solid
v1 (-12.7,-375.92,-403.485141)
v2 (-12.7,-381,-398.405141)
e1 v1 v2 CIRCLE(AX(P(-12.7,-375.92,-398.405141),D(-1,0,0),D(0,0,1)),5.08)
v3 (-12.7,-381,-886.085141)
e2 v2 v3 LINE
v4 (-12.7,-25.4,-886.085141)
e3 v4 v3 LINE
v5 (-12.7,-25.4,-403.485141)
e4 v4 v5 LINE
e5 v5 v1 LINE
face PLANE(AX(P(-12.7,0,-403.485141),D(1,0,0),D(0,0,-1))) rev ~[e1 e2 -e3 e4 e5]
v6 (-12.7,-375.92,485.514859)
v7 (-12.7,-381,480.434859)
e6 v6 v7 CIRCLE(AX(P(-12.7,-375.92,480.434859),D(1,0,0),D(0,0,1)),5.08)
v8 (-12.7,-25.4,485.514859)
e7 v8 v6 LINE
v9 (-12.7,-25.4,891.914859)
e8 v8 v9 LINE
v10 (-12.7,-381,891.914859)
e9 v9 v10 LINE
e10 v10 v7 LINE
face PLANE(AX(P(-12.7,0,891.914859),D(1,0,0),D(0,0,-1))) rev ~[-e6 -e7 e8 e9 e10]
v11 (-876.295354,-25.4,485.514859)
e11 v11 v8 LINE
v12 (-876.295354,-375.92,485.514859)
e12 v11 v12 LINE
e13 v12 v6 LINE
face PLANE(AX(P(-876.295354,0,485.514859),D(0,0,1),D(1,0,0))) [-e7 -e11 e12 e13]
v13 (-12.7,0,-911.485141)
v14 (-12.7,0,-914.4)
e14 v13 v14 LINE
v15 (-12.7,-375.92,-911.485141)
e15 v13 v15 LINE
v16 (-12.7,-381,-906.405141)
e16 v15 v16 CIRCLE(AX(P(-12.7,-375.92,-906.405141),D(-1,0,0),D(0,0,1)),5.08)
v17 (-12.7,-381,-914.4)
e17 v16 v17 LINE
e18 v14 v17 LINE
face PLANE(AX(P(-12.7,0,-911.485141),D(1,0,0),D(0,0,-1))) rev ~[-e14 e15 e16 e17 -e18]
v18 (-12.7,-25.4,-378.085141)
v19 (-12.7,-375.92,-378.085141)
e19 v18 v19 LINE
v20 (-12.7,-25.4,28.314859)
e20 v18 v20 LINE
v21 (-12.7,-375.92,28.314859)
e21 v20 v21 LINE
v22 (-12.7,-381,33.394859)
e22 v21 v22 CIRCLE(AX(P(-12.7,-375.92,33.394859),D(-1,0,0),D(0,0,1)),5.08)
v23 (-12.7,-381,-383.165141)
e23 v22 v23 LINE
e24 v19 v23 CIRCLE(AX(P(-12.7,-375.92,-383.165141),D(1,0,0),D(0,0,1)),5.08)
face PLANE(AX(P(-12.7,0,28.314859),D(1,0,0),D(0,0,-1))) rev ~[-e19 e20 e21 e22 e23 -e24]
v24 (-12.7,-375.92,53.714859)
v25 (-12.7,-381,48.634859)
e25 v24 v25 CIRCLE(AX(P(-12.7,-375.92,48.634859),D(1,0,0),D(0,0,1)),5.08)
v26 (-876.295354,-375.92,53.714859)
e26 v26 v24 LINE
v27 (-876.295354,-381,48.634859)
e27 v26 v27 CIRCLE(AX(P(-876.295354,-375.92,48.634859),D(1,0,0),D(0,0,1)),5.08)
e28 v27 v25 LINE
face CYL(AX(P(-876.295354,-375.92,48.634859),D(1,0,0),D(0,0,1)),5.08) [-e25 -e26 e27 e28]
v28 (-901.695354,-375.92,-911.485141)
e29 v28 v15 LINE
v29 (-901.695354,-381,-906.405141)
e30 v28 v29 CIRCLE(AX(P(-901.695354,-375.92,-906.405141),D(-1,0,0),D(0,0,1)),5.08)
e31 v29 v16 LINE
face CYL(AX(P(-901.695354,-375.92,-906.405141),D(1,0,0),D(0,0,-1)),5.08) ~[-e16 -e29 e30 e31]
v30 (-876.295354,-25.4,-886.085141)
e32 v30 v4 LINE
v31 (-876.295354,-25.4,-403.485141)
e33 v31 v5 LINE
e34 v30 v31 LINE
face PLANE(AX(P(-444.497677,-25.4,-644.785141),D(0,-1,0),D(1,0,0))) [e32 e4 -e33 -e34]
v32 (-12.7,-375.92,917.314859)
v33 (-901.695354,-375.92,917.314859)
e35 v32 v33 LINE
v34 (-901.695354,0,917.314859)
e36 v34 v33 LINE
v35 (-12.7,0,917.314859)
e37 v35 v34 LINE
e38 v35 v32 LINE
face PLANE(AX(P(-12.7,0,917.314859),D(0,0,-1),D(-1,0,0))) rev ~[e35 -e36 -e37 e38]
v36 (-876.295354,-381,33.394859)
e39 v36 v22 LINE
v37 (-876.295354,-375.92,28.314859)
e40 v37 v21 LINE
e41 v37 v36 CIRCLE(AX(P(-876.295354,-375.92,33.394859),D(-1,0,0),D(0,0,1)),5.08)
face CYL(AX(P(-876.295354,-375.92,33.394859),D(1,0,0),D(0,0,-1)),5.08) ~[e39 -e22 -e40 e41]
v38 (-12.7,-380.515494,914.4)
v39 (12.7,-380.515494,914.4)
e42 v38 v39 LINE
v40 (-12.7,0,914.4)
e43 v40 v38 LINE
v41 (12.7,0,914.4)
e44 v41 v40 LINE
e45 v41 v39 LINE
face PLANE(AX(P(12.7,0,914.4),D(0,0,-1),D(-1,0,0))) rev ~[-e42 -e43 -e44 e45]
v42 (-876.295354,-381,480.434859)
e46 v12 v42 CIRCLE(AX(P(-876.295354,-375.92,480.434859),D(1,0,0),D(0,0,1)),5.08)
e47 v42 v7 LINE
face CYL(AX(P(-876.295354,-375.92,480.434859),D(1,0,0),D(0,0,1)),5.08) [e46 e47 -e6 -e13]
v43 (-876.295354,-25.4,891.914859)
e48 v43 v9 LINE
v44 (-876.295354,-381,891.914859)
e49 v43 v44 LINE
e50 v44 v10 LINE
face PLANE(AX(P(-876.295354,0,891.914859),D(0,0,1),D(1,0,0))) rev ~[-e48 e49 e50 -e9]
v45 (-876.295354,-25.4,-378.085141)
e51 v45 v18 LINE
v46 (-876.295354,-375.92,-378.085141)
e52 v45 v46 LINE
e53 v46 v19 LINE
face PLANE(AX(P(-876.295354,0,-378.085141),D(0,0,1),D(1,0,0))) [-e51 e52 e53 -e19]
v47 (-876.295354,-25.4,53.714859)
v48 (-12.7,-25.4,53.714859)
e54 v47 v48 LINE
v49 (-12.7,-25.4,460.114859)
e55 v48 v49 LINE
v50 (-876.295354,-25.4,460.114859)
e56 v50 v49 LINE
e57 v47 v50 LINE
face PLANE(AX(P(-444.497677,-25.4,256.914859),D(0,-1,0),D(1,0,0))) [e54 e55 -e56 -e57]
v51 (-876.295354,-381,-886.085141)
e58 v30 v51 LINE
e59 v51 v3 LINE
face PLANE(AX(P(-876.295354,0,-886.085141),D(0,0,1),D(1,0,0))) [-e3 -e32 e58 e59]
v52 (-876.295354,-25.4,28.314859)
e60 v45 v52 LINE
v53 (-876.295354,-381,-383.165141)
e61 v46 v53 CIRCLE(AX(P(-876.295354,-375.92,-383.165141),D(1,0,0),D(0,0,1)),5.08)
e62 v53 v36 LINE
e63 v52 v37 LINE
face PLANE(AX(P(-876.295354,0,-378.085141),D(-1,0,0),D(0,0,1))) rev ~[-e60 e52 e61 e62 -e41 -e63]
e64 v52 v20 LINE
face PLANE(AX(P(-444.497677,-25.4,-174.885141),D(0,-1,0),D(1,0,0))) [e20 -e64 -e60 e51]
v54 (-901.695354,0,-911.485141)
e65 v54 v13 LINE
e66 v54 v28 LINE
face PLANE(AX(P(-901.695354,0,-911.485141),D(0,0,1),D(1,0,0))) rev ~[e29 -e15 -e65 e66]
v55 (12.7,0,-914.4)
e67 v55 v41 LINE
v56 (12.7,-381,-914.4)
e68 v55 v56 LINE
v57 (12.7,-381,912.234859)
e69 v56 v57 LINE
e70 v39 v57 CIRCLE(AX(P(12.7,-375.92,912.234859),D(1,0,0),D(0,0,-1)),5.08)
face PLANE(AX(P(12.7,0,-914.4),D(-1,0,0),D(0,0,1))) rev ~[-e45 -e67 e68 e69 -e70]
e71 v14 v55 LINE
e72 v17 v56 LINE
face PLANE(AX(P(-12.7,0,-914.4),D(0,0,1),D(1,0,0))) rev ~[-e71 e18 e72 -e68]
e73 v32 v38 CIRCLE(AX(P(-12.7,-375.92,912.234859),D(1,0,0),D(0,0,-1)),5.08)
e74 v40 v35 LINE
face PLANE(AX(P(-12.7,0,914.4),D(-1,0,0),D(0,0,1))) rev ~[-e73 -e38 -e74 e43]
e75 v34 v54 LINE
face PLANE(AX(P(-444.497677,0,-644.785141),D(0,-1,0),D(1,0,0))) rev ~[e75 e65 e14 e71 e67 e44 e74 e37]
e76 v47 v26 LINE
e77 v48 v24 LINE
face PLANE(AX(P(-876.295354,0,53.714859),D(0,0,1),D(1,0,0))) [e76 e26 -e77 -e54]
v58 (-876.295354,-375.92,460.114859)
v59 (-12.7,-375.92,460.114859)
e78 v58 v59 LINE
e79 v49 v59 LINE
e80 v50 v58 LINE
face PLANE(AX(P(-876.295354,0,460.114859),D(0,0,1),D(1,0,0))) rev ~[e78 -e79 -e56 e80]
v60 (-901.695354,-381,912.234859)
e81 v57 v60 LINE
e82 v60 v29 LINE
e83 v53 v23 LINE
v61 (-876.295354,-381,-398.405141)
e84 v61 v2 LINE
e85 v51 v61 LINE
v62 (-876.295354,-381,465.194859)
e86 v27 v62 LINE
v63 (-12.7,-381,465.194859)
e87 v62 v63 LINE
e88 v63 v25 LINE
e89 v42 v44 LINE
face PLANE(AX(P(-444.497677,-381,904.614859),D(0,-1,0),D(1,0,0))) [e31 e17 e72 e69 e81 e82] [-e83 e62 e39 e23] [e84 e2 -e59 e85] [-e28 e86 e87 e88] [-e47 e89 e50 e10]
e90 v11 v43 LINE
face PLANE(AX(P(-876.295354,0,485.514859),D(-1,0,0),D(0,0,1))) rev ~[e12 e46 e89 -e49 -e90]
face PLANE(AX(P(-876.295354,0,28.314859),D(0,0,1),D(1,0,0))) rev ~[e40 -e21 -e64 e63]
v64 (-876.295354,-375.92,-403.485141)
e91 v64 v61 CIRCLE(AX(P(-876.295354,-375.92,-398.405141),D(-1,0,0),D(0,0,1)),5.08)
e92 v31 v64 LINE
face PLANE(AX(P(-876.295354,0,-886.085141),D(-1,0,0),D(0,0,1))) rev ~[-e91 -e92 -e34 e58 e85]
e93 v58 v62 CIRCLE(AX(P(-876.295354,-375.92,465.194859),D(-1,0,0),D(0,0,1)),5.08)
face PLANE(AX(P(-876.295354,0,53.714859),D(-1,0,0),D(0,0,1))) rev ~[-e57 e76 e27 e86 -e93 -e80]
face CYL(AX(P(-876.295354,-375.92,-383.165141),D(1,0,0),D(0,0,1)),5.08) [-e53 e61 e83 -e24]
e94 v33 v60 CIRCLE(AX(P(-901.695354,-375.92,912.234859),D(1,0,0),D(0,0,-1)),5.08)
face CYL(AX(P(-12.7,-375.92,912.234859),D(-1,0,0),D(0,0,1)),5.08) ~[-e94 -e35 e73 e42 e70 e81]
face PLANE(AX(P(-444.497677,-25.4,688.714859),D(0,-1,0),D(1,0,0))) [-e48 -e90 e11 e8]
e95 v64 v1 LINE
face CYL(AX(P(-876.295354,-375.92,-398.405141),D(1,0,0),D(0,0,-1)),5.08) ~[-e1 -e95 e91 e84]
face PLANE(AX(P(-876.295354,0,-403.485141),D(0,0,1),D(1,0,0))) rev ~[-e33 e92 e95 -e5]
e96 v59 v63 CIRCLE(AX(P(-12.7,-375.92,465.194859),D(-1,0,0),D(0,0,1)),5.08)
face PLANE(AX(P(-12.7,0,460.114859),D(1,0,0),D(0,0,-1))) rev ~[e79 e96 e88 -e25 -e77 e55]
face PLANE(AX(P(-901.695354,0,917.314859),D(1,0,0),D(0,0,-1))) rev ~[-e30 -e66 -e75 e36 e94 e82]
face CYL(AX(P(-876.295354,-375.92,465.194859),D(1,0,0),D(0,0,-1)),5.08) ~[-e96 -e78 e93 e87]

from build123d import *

# Parameters (mm, degrees)
F0_W     = 863.595354099
F0_H     = 25.4
F1_DEPTH = 381
F2_R     = 5.08
F0_H_2   = 482.6
F0_H_3   = 406.4
F3_DEPTH = 25.4


with BuildPart() as f1:
    # F0 (on Front) → F1 (new body)
    with BuildSketch(Plane.XZ):
        Polygon((-12.7, 891.914858846), (-12.7, 914.4), (-12.7, 917.314858846), (-876.295354099, 917.314858846), (-876.295354099, 891.914858846), align=None)
        with Locations((-444.4976770495, -898.785141154)):
            Rectangle(F0_W, F0_H)
        Polygon((-901.695354099, -911.485141154), (-876.295354099, -911.485141154), (-876.295354099, -886.085141154), (-876.295354099, -403.485141154), (-876.295354099, -378.085141154), (-876.295354099, 28.314858846), (-876.295354099, 53.714858846), (-876.295354099, 460.114858846), (-876.295354099, 485.514858846), (-876.295354099, 891.914858846), (-876.295354099, 917.314858846), (-901.695354099, 917.314858846), align=None)
        Polygon((-12.7, -911.485141154), (-12.7, -914.4), (12.7, -914.4), (12.7, 914.4), (-12.7, 914.4), (-12.7, 891.914858846), (-12.7, 485.514858846), (-12.7, 460.114858846), (-12.7, 53.714858846), (-12.7, 28.314858846), (-12.7, -378.085141154), (-12.7, -403.485141154), (-12.7, -886.085141154), align=None)
        with Locations((-444.4976770495, 472.814858846)):
            Rectangle(F0_W, F0_H)
        with Locations((-444.4976770495, 41.014858846)):
            Rectangle(F0_W, F0_H)
        with Locations((-444.4976770495, -390.785141154)):
            Rectangle(F0_W, F0_H)
    extrude(amount=F1_DEPTH)

    # F2
    f2_edges = [f1.edges().sort_by_distance(p)[0] for p in [
        (-457.197677, -381, 917.314859),
        (-444.497677, -381, 485.514859),
        (-444.497677, -381, 460.114859),
        (-444.497677, -381, 53.714859),
        (-444.497677, -381, -378.085141),
        (-444.497677, -381, 28.314859),
        (-444.497677, -381, -403.485141),
        (-457.197677, -381, -911.485141),
    ]]
    fillet(f2_edges, radius=F2_R)

    # F0 (on Front) → F3 (join)
    with BuildSketch(Plane.XZ):
        with Locations((-444.4976770495, -644.785141154)):
            Rectangle(F0_W, F0_H_2)
        with Locations((-444.4976770495, -174.885141154)):
            Rectangle(F0_W, F0_H_3)
        with Locations((-444.4976770495, 256.914858846)):
            Rectangle(F0_W, F0_H_3)
        with Locations((-444.4976770495, 688.714858846)):
            Rectangle(F0_W, F0_H_3)
    extrude(amount=F3_DEPTH)


solid = f1.part
